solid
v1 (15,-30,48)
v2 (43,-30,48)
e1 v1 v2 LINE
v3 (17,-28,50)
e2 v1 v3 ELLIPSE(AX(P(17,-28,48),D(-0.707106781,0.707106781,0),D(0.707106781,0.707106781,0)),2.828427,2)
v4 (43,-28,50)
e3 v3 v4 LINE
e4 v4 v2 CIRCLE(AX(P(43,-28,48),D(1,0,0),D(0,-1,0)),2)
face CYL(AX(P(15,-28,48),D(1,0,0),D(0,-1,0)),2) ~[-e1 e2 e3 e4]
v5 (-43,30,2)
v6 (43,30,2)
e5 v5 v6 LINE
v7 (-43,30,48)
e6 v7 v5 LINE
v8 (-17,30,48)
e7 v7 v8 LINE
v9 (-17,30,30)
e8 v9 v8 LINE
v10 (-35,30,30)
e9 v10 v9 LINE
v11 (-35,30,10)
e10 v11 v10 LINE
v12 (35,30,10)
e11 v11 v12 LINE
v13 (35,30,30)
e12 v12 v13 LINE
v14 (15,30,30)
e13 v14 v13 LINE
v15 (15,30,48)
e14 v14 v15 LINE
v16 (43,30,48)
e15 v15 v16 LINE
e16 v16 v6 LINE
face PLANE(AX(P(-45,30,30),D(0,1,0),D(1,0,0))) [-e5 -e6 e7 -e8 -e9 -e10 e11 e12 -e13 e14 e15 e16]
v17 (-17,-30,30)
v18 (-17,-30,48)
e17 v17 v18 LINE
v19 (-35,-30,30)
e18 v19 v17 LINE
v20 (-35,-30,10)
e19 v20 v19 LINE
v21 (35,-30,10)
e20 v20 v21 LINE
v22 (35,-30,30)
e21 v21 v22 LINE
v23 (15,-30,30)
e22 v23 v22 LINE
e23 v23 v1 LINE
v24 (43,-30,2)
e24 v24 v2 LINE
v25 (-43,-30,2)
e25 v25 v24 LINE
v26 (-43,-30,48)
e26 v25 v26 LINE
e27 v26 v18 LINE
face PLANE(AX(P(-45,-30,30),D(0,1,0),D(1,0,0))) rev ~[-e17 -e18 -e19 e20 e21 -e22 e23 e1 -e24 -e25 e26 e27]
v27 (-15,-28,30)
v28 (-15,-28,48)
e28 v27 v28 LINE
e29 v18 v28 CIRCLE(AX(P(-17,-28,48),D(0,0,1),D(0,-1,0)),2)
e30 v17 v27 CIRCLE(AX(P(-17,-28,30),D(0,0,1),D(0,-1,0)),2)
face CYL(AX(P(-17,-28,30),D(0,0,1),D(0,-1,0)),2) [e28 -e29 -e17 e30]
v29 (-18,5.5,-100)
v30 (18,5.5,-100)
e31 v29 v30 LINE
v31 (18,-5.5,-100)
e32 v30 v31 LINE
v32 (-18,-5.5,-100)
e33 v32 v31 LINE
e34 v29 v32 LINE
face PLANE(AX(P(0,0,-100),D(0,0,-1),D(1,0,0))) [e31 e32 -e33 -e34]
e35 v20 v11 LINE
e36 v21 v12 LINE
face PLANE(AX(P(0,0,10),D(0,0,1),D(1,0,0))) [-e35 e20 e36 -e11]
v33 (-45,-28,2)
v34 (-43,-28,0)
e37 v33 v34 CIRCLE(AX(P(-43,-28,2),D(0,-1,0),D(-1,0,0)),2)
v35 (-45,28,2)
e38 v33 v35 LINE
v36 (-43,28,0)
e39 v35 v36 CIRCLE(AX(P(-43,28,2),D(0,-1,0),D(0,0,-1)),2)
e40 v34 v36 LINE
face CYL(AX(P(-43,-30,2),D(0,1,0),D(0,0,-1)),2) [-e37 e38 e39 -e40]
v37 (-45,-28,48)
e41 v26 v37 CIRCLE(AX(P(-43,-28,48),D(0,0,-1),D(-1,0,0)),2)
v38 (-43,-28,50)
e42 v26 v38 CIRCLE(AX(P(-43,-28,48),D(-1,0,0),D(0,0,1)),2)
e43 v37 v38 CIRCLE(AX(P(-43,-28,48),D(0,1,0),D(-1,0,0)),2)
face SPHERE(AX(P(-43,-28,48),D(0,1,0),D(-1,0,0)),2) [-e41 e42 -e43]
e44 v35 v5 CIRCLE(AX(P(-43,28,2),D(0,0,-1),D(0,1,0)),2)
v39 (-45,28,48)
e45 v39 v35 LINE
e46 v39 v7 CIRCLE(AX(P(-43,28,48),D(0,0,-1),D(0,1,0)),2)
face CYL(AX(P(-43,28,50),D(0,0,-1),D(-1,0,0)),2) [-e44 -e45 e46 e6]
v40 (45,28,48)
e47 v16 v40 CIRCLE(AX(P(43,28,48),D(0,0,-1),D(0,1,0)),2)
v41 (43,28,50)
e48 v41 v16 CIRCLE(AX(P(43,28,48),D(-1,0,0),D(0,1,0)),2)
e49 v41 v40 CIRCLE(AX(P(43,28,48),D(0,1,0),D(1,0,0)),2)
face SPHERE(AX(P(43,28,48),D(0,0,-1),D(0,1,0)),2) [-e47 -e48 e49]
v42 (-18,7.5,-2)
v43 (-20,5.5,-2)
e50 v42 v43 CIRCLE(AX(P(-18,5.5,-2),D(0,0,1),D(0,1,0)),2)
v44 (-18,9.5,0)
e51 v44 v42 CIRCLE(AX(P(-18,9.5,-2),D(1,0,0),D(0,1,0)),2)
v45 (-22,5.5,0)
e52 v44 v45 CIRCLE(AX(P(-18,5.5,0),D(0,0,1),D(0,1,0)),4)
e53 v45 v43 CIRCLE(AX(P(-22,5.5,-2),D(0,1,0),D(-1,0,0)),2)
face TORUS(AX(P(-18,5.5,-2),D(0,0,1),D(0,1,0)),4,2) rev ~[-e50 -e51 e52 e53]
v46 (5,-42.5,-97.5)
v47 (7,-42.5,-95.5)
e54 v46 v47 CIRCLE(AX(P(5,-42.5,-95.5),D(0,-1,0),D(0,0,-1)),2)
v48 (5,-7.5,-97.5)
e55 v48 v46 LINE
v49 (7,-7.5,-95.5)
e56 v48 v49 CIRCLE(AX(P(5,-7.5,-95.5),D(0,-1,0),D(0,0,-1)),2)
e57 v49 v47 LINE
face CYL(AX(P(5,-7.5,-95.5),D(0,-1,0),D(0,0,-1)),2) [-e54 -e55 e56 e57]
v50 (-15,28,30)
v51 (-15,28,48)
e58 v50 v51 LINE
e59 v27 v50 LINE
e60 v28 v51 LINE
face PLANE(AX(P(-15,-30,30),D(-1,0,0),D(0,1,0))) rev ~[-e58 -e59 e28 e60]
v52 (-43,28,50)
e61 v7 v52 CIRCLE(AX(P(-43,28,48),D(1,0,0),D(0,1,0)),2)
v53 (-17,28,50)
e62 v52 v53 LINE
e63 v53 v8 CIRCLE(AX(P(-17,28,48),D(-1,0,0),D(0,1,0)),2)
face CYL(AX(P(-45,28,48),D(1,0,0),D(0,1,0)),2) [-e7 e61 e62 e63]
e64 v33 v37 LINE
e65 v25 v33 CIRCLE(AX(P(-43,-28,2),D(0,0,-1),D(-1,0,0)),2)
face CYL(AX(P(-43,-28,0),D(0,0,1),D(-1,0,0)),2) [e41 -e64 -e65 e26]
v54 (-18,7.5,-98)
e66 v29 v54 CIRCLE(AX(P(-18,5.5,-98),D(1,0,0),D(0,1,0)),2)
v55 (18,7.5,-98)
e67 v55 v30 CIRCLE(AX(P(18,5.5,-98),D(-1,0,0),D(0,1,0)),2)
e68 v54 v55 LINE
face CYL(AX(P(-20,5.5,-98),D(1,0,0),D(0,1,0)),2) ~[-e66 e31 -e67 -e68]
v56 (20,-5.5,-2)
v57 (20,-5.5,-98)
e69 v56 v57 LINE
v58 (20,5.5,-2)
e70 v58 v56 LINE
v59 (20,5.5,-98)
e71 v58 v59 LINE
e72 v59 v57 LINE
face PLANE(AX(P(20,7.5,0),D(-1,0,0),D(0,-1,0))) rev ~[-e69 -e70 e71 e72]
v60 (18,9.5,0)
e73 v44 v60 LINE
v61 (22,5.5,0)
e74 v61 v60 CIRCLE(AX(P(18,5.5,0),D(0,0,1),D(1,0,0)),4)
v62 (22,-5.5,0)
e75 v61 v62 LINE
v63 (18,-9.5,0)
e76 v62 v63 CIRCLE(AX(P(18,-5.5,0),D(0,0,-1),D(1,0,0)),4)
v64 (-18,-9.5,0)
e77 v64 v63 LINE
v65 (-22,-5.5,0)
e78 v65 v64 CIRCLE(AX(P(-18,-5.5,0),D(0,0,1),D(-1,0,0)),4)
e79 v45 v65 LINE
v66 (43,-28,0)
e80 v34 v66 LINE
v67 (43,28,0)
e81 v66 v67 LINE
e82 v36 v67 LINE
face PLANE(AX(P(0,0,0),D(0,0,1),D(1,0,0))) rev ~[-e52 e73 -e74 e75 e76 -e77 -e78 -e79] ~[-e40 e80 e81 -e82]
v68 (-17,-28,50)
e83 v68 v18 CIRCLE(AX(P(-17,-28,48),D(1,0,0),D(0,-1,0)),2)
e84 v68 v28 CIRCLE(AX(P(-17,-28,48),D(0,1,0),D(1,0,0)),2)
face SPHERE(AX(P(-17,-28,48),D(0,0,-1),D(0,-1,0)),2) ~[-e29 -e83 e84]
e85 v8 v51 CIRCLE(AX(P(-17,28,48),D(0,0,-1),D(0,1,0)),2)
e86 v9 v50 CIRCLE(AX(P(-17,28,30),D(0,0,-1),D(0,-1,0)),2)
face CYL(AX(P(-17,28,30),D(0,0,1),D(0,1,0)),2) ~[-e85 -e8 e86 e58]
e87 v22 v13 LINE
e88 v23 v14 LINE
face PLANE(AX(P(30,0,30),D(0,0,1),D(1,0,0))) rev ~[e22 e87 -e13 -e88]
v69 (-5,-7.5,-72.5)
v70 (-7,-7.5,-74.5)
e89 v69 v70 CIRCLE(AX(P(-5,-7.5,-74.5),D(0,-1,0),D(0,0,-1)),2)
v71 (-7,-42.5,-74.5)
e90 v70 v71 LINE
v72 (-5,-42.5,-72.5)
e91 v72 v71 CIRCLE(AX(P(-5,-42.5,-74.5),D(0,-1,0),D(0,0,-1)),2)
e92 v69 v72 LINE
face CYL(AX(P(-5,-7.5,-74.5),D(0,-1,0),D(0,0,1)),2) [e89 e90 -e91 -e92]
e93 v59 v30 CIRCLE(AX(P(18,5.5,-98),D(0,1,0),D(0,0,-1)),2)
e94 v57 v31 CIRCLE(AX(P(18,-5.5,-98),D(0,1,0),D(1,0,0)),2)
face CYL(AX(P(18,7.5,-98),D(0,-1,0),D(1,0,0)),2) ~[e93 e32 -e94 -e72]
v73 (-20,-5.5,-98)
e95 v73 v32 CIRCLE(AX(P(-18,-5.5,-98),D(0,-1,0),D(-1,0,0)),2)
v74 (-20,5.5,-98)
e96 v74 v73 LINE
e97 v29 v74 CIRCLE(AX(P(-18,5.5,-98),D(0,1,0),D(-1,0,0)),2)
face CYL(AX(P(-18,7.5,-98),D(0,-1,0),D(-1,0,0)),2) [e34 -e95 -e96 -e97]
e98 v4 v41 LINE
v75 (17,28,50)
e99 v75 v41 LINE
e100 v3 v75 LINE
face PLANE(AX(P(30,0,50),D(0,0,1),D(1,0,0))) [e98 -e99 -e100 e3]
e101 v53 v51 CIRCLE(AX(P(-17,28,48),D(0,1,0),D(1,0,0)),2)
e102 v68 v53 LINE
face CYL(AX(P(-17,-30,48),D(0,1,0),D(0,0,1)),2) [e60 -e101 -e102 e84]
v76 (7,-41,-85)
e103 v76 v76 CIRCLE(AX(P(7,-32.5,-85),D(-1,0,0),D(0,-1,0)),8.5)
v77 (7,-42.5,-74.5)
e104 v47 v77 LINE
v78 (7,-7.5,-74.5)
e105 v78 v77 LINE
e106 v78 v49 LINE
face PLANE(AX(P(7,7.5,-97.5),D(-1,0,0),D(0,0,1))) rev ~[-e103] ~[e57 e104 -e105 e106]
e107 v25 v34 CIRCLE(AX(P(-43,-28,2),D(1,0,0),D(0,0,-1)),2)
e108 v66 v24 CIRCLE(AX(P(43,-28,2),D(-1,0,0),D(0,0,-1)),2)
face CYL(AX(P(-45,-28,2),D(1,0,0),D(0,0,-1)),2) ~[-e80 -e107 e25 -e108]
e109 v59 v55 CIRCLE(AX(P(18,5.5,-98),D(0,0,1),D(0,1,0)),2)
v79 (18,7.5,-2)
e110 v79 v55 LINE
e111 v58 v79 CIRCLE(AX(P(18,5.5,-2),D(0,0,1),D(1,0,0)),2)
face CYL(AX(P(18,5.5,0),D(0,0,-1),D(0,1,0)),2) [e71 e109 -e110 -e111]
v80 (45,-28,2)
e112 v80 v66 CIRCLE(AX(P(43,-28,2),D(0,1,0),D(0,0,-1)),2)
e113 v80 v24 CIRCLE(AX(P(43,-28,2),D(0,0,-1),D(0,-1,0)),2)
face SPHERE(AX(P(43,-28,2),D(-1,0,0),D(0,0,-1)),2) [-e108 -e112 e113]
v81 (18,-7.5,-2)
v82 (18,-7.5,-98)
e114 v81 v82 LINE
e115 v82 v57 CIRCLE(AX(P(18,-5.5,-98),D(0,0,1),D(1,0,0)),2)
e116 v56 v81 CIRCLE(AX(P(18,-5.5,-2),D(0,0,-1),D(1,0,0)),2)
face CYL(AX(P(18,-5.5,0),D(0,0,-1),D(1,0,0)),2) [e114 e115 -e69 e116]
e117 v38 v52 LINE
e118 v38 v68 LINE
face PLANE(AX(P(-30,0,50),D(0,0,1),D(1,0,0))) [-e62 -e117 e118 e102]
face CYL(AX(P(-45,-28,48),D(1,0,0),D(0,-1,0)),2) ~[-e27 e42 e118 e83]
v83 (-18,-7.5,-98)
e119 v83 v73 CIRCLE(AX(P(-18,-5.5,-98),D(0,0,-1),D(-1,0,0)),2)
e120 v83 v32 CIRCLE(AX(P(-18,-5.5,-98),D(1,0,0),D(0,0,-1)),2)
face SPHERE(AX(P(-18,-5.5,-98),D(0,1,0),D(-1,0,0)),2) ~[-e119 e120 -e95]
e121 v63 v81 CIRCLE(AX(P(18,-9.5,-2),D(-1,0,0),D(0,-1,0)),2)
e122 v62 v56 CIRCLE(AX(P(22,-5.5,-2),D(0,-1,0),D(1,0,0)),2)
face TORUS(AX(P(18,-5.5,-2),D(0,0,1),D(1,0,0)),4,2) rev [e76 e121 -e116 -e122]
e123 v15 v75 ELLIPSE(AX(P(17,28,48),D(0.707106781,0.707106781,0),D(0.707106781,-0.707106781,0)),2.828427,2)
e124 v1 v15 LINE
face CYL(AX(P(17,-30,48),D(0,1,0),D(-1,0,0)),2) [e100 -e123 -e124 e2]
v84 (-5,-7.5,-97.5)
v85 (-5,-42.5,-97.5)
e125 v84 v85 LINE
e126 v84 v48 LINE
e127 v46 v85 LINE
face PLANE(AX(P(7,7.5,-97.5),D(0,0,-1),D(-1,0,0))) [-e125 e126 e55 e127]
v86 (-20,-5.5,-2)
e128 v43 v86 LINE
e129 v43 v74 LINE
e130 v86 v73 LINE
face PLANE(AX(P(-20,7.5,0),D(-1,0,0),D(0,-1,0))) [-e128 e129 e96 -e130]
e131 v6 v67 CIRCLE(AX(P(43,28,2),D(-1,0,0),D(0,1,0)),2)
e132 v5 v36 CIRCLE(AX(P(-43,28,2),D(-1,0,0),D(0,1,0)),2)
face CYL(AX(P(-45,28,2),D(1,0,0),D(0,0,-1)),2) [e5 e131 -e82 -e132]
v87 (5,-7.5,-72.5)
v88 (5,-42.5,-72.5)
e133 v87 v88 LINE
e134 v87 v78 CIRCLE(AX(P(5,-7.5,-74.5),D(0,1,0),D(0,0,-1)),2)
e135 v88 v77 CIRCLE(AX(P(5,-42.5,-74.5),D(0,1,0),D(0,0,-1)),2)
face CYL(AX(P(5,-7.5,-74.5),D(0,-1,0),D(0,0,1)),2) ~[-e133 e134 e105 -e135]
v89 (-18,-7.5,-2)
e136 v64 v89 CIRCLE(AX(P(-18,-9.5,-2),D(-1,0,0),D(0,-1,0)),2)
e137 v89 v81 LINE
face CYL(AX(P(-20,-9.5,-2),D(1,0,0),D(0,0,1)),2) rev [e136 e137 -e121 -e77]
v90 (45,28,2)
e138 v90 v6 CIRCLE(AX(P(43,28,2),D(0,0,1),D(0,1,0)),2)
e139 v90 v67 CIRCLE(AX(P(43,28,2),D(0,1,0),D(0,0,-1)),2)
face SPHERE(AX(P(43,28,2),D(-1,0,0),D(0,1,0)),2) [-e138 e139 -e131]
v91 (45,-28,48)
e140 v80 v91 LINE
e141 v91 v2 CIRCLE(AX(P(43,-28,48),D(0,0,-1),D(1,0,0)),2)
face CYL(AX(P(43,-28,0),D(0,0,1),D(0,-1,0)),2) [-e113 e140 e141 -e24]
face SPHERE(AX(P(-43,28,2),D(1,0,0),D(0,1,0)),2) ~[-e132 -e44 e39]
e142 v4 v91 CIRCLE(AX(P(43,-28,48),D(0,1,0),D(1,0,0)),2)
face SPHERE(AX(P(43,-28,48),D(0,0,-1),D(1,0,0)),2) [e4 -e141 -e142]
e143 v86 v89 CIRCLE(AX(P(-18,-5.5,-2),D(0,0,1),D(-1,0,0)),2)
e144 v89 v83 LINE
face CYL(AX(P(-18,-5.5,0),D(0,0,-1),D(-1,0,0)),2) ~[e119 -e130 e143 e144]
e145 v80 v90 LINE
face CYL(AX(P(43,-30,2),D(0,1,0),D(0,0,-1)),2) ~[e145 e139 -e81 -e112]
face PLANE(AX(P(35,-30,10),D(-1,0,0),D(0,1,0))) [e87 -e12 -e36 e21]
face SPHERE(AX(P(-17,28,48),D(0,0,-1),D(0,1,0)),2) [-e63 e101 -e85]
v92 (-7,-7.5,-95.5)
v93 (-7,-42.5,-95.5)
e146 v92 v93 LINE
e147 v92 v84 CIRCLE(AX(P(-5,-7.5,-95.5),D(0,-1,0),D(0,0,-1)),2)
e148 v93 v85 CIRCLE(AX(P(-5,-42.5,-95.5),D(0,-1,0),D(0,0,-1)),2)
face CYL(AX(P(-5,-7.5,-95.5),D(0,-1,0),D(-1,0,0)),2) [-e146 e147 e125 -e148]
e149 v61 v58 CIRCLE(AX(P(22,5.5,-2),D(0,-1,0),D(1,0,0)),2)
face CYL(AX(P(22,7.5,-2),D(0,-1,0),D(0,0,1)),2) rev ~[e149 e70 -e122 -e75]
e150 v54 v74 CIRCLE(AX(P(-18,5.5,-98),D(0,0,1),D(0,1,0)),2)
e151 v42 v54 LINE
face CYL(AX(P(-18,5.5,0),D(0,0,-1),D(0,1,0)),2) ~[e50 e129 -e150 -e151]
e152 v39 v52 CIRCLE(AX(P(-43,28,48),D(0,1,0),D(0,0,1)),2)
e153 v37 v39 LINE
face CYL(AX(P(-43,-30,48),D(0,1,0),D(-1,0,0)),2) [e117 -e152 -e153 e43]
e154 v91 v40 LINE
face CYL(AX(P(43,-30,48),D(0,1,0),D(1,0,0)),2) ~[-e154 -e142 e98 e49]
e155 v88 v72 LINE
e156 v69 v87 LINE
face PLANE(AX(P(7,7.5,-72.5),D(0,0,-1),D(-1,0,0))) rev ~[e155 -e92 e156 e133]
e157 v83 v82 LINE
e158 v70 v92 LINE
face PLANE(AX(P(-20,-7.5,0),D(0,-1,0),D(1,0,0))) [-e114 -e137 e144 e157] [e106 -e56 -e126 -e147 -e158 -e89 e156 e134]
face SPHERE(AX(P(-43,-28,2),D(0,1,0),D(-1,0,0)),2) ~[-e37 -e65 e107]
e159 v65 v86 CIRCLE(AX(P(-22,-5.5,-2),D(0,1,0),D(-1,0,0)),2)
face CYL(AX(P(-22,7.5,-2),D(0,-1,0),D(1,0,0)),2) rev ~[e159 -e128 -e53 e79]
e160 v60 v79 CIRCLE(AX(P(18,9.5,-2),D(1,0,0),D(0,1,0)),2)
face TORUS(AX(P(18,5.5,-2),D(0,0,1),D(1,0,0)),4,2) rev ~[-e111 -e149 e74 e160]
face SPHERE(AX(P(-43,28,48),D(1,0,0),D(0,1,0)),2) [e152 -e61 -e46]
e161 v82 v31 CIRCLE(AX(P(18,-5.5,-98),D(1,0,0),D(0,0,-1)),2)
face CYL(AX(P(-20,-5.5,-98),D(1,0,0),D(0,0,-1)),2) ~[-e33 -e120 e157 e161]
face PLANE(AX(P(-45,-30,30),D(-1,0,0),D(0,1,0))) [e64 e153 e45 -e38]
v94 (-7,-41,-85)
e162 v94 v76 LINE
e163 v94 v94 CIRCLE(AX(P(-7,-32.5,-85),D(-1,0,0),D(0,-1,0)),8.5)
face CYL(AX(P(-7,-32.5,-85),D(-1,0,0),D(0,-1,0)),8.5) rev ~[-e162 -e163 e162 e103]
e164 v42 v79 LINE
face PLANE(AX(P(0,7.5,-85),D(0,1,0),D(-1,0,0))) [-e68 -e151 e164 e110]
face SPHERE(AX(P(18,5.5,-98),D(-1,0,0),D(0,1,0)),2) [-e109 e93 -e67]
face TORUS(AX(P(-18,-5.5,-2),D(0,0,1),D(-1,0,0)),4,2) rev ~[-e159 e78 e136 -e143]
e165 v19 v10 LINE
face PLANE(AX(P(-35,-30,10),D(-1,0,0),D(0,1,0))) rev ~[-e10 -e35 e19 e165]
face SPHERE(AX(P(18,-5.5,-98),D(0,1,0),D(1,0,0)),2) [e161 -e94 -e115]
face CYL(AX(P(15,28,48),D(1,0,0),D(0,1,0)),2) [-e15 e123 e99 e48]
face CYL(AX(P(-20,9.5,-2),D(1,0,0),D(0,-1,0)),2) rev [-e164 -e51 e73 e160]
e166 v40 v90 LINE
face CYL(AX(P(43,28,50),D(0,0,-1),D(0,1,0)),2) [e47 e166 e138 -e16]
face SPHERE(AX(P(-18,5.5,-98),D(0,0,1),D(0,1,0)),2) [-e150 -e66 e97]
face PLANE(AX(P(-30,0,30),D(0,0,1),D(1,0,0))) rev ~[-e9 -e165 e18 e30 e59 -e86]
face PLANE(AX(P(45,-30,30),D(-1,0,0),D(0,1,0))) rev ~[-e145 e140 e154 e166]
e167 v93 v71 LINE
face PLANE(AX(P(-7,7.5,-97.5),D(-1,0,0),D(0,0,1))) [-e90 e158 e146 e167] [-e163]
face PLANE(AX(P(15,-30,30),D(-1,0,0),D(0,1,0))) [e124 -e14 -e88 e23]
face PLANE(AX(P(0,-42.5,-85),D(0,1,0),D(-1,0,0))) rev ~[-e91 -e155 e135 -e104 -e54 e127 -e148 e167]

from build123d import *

# Parameters (mm, degrees)
F0_W      = 90
F0_H      = 60
F1_DEPTH  = 10
F2_W      = 10
F2_H      = 60
F3_DEPTH  = 20
F5_W      = 30
F5_H      = 60
F6_DEPTH  = 20
F4_W      = 30
F4_H      = 60
F7_DEPTH  = 20
F8_W      = 40
F8_H      = 15
F9_DEPTH  = 100
F10_W     = 14
F10_H     = 25
F11_DEPTH = 50
F12_R     = 8.5
F13_DEPTH = 52.001
F14_R     = 2


with BuildPart() as f1:
    # F0 (on Top) → F1 (new body)
    with BuildSketch(Plane.XY):
        Rectangle(F0_W, F0_H)
    extrude(amount=F1_DEPTH)

    # F2 (on face) → F3 (join)
    with BuildSketch(Plane.XY.offset(10)):
        with Locations((-40, 0)):
            Rectangle(F2_W, F2_H)
        with Locations((40, 0)):
            Rectangle(F2_W, F2_H)
    extrude(amount=F3_DEPTH)

    # F5 (on face) → F6 (join)
    with BuildSketch(Plane.XY.offset(30)):
        with Locations((30, 0)):
            Rectangle(F5_W, F5_H)
    extrude(amount=F6_DEPTH)

    # F4 (on face) → F7 (join)
    with BuildSketch(Plane.XY.offset(30)):
        with Locations((-30, 0)):
            Rectangle(F4_W, F4_H)
    extrude(amount=F7_DEPTH)

    # F8 (on face) → F9 (join)
    with BuildSketch(Plane(origin=(0, 0, 0), x_dir=(1, 0, 0), z_dir=(0, 0, -1))):
        Rectangle(F8_W, F8_H)
    extrude(amount=F9_DEPTH)

    # F10 (on face) → F11 (join)
    with BuildSketch(Plane(origin=(0, 7.5, 0), x_dir=(-1, 0, 0), z_dir=(0, 1, 0))):
        with Locations((0, -85)):
            Rectangle(F10_W, F10_H)
    extrude(amount=-F11_DEPTH)

    # F12 (on face) → F13 (cut, through all)
    with BuildSketch(Plane(origin=(-7, 0, 0), x_dir=(0, -1, 0), z_dir=(-1, 0, 0))):
        with Locations((32.5, -85)):
            Circle(F12_R)
    extrude(amount=-F13_DEPTH, mode=Mode.SUBTRACT)

    # F14
    f14_edges = [f1.edges().sort_by_distance(p)[0] for p in [
        (-20, 7.5, -50),
        (0, 7.5, -100),
        (20, 7.5, -50),
        (20, 0, -100),
        (-20, 0, -100),
        (-20, -7.5, -50),
        (20, -7.5, -50),
        (20, 0, 0),
        (0, -7.5, -100),
        (0, 30, 0),
        (45, 30, 25),
        (30, 30, 50),
        (-15, 30, 40),
        (-30, 30, 50),
        (-45, 30, 25),
        (-45, 0, 0),
        (-45, 0, 50),
        (-45, -30, 25),
        (0, -30, 0),
        (45, 0, 0),
        (45, -30, 25),
        (45, 0, 50),
        (30, -30, 50),
        (-15, -30, 40),
        (-30, -30, 50),
        (-15, 0, 50),
        (15, 0, 50),
        (-7, -25, -97.5),
        (-7, -25, -72.5),
        (7, -25, -97.5),
        (7, -25, -72.5),
        (0, 7.5, 0),
        (-20, 0, 0),
        (0, -7.5, 0),
    ]]
    fillet(f14_edges, radius=F14_R)


solid = f1.part
